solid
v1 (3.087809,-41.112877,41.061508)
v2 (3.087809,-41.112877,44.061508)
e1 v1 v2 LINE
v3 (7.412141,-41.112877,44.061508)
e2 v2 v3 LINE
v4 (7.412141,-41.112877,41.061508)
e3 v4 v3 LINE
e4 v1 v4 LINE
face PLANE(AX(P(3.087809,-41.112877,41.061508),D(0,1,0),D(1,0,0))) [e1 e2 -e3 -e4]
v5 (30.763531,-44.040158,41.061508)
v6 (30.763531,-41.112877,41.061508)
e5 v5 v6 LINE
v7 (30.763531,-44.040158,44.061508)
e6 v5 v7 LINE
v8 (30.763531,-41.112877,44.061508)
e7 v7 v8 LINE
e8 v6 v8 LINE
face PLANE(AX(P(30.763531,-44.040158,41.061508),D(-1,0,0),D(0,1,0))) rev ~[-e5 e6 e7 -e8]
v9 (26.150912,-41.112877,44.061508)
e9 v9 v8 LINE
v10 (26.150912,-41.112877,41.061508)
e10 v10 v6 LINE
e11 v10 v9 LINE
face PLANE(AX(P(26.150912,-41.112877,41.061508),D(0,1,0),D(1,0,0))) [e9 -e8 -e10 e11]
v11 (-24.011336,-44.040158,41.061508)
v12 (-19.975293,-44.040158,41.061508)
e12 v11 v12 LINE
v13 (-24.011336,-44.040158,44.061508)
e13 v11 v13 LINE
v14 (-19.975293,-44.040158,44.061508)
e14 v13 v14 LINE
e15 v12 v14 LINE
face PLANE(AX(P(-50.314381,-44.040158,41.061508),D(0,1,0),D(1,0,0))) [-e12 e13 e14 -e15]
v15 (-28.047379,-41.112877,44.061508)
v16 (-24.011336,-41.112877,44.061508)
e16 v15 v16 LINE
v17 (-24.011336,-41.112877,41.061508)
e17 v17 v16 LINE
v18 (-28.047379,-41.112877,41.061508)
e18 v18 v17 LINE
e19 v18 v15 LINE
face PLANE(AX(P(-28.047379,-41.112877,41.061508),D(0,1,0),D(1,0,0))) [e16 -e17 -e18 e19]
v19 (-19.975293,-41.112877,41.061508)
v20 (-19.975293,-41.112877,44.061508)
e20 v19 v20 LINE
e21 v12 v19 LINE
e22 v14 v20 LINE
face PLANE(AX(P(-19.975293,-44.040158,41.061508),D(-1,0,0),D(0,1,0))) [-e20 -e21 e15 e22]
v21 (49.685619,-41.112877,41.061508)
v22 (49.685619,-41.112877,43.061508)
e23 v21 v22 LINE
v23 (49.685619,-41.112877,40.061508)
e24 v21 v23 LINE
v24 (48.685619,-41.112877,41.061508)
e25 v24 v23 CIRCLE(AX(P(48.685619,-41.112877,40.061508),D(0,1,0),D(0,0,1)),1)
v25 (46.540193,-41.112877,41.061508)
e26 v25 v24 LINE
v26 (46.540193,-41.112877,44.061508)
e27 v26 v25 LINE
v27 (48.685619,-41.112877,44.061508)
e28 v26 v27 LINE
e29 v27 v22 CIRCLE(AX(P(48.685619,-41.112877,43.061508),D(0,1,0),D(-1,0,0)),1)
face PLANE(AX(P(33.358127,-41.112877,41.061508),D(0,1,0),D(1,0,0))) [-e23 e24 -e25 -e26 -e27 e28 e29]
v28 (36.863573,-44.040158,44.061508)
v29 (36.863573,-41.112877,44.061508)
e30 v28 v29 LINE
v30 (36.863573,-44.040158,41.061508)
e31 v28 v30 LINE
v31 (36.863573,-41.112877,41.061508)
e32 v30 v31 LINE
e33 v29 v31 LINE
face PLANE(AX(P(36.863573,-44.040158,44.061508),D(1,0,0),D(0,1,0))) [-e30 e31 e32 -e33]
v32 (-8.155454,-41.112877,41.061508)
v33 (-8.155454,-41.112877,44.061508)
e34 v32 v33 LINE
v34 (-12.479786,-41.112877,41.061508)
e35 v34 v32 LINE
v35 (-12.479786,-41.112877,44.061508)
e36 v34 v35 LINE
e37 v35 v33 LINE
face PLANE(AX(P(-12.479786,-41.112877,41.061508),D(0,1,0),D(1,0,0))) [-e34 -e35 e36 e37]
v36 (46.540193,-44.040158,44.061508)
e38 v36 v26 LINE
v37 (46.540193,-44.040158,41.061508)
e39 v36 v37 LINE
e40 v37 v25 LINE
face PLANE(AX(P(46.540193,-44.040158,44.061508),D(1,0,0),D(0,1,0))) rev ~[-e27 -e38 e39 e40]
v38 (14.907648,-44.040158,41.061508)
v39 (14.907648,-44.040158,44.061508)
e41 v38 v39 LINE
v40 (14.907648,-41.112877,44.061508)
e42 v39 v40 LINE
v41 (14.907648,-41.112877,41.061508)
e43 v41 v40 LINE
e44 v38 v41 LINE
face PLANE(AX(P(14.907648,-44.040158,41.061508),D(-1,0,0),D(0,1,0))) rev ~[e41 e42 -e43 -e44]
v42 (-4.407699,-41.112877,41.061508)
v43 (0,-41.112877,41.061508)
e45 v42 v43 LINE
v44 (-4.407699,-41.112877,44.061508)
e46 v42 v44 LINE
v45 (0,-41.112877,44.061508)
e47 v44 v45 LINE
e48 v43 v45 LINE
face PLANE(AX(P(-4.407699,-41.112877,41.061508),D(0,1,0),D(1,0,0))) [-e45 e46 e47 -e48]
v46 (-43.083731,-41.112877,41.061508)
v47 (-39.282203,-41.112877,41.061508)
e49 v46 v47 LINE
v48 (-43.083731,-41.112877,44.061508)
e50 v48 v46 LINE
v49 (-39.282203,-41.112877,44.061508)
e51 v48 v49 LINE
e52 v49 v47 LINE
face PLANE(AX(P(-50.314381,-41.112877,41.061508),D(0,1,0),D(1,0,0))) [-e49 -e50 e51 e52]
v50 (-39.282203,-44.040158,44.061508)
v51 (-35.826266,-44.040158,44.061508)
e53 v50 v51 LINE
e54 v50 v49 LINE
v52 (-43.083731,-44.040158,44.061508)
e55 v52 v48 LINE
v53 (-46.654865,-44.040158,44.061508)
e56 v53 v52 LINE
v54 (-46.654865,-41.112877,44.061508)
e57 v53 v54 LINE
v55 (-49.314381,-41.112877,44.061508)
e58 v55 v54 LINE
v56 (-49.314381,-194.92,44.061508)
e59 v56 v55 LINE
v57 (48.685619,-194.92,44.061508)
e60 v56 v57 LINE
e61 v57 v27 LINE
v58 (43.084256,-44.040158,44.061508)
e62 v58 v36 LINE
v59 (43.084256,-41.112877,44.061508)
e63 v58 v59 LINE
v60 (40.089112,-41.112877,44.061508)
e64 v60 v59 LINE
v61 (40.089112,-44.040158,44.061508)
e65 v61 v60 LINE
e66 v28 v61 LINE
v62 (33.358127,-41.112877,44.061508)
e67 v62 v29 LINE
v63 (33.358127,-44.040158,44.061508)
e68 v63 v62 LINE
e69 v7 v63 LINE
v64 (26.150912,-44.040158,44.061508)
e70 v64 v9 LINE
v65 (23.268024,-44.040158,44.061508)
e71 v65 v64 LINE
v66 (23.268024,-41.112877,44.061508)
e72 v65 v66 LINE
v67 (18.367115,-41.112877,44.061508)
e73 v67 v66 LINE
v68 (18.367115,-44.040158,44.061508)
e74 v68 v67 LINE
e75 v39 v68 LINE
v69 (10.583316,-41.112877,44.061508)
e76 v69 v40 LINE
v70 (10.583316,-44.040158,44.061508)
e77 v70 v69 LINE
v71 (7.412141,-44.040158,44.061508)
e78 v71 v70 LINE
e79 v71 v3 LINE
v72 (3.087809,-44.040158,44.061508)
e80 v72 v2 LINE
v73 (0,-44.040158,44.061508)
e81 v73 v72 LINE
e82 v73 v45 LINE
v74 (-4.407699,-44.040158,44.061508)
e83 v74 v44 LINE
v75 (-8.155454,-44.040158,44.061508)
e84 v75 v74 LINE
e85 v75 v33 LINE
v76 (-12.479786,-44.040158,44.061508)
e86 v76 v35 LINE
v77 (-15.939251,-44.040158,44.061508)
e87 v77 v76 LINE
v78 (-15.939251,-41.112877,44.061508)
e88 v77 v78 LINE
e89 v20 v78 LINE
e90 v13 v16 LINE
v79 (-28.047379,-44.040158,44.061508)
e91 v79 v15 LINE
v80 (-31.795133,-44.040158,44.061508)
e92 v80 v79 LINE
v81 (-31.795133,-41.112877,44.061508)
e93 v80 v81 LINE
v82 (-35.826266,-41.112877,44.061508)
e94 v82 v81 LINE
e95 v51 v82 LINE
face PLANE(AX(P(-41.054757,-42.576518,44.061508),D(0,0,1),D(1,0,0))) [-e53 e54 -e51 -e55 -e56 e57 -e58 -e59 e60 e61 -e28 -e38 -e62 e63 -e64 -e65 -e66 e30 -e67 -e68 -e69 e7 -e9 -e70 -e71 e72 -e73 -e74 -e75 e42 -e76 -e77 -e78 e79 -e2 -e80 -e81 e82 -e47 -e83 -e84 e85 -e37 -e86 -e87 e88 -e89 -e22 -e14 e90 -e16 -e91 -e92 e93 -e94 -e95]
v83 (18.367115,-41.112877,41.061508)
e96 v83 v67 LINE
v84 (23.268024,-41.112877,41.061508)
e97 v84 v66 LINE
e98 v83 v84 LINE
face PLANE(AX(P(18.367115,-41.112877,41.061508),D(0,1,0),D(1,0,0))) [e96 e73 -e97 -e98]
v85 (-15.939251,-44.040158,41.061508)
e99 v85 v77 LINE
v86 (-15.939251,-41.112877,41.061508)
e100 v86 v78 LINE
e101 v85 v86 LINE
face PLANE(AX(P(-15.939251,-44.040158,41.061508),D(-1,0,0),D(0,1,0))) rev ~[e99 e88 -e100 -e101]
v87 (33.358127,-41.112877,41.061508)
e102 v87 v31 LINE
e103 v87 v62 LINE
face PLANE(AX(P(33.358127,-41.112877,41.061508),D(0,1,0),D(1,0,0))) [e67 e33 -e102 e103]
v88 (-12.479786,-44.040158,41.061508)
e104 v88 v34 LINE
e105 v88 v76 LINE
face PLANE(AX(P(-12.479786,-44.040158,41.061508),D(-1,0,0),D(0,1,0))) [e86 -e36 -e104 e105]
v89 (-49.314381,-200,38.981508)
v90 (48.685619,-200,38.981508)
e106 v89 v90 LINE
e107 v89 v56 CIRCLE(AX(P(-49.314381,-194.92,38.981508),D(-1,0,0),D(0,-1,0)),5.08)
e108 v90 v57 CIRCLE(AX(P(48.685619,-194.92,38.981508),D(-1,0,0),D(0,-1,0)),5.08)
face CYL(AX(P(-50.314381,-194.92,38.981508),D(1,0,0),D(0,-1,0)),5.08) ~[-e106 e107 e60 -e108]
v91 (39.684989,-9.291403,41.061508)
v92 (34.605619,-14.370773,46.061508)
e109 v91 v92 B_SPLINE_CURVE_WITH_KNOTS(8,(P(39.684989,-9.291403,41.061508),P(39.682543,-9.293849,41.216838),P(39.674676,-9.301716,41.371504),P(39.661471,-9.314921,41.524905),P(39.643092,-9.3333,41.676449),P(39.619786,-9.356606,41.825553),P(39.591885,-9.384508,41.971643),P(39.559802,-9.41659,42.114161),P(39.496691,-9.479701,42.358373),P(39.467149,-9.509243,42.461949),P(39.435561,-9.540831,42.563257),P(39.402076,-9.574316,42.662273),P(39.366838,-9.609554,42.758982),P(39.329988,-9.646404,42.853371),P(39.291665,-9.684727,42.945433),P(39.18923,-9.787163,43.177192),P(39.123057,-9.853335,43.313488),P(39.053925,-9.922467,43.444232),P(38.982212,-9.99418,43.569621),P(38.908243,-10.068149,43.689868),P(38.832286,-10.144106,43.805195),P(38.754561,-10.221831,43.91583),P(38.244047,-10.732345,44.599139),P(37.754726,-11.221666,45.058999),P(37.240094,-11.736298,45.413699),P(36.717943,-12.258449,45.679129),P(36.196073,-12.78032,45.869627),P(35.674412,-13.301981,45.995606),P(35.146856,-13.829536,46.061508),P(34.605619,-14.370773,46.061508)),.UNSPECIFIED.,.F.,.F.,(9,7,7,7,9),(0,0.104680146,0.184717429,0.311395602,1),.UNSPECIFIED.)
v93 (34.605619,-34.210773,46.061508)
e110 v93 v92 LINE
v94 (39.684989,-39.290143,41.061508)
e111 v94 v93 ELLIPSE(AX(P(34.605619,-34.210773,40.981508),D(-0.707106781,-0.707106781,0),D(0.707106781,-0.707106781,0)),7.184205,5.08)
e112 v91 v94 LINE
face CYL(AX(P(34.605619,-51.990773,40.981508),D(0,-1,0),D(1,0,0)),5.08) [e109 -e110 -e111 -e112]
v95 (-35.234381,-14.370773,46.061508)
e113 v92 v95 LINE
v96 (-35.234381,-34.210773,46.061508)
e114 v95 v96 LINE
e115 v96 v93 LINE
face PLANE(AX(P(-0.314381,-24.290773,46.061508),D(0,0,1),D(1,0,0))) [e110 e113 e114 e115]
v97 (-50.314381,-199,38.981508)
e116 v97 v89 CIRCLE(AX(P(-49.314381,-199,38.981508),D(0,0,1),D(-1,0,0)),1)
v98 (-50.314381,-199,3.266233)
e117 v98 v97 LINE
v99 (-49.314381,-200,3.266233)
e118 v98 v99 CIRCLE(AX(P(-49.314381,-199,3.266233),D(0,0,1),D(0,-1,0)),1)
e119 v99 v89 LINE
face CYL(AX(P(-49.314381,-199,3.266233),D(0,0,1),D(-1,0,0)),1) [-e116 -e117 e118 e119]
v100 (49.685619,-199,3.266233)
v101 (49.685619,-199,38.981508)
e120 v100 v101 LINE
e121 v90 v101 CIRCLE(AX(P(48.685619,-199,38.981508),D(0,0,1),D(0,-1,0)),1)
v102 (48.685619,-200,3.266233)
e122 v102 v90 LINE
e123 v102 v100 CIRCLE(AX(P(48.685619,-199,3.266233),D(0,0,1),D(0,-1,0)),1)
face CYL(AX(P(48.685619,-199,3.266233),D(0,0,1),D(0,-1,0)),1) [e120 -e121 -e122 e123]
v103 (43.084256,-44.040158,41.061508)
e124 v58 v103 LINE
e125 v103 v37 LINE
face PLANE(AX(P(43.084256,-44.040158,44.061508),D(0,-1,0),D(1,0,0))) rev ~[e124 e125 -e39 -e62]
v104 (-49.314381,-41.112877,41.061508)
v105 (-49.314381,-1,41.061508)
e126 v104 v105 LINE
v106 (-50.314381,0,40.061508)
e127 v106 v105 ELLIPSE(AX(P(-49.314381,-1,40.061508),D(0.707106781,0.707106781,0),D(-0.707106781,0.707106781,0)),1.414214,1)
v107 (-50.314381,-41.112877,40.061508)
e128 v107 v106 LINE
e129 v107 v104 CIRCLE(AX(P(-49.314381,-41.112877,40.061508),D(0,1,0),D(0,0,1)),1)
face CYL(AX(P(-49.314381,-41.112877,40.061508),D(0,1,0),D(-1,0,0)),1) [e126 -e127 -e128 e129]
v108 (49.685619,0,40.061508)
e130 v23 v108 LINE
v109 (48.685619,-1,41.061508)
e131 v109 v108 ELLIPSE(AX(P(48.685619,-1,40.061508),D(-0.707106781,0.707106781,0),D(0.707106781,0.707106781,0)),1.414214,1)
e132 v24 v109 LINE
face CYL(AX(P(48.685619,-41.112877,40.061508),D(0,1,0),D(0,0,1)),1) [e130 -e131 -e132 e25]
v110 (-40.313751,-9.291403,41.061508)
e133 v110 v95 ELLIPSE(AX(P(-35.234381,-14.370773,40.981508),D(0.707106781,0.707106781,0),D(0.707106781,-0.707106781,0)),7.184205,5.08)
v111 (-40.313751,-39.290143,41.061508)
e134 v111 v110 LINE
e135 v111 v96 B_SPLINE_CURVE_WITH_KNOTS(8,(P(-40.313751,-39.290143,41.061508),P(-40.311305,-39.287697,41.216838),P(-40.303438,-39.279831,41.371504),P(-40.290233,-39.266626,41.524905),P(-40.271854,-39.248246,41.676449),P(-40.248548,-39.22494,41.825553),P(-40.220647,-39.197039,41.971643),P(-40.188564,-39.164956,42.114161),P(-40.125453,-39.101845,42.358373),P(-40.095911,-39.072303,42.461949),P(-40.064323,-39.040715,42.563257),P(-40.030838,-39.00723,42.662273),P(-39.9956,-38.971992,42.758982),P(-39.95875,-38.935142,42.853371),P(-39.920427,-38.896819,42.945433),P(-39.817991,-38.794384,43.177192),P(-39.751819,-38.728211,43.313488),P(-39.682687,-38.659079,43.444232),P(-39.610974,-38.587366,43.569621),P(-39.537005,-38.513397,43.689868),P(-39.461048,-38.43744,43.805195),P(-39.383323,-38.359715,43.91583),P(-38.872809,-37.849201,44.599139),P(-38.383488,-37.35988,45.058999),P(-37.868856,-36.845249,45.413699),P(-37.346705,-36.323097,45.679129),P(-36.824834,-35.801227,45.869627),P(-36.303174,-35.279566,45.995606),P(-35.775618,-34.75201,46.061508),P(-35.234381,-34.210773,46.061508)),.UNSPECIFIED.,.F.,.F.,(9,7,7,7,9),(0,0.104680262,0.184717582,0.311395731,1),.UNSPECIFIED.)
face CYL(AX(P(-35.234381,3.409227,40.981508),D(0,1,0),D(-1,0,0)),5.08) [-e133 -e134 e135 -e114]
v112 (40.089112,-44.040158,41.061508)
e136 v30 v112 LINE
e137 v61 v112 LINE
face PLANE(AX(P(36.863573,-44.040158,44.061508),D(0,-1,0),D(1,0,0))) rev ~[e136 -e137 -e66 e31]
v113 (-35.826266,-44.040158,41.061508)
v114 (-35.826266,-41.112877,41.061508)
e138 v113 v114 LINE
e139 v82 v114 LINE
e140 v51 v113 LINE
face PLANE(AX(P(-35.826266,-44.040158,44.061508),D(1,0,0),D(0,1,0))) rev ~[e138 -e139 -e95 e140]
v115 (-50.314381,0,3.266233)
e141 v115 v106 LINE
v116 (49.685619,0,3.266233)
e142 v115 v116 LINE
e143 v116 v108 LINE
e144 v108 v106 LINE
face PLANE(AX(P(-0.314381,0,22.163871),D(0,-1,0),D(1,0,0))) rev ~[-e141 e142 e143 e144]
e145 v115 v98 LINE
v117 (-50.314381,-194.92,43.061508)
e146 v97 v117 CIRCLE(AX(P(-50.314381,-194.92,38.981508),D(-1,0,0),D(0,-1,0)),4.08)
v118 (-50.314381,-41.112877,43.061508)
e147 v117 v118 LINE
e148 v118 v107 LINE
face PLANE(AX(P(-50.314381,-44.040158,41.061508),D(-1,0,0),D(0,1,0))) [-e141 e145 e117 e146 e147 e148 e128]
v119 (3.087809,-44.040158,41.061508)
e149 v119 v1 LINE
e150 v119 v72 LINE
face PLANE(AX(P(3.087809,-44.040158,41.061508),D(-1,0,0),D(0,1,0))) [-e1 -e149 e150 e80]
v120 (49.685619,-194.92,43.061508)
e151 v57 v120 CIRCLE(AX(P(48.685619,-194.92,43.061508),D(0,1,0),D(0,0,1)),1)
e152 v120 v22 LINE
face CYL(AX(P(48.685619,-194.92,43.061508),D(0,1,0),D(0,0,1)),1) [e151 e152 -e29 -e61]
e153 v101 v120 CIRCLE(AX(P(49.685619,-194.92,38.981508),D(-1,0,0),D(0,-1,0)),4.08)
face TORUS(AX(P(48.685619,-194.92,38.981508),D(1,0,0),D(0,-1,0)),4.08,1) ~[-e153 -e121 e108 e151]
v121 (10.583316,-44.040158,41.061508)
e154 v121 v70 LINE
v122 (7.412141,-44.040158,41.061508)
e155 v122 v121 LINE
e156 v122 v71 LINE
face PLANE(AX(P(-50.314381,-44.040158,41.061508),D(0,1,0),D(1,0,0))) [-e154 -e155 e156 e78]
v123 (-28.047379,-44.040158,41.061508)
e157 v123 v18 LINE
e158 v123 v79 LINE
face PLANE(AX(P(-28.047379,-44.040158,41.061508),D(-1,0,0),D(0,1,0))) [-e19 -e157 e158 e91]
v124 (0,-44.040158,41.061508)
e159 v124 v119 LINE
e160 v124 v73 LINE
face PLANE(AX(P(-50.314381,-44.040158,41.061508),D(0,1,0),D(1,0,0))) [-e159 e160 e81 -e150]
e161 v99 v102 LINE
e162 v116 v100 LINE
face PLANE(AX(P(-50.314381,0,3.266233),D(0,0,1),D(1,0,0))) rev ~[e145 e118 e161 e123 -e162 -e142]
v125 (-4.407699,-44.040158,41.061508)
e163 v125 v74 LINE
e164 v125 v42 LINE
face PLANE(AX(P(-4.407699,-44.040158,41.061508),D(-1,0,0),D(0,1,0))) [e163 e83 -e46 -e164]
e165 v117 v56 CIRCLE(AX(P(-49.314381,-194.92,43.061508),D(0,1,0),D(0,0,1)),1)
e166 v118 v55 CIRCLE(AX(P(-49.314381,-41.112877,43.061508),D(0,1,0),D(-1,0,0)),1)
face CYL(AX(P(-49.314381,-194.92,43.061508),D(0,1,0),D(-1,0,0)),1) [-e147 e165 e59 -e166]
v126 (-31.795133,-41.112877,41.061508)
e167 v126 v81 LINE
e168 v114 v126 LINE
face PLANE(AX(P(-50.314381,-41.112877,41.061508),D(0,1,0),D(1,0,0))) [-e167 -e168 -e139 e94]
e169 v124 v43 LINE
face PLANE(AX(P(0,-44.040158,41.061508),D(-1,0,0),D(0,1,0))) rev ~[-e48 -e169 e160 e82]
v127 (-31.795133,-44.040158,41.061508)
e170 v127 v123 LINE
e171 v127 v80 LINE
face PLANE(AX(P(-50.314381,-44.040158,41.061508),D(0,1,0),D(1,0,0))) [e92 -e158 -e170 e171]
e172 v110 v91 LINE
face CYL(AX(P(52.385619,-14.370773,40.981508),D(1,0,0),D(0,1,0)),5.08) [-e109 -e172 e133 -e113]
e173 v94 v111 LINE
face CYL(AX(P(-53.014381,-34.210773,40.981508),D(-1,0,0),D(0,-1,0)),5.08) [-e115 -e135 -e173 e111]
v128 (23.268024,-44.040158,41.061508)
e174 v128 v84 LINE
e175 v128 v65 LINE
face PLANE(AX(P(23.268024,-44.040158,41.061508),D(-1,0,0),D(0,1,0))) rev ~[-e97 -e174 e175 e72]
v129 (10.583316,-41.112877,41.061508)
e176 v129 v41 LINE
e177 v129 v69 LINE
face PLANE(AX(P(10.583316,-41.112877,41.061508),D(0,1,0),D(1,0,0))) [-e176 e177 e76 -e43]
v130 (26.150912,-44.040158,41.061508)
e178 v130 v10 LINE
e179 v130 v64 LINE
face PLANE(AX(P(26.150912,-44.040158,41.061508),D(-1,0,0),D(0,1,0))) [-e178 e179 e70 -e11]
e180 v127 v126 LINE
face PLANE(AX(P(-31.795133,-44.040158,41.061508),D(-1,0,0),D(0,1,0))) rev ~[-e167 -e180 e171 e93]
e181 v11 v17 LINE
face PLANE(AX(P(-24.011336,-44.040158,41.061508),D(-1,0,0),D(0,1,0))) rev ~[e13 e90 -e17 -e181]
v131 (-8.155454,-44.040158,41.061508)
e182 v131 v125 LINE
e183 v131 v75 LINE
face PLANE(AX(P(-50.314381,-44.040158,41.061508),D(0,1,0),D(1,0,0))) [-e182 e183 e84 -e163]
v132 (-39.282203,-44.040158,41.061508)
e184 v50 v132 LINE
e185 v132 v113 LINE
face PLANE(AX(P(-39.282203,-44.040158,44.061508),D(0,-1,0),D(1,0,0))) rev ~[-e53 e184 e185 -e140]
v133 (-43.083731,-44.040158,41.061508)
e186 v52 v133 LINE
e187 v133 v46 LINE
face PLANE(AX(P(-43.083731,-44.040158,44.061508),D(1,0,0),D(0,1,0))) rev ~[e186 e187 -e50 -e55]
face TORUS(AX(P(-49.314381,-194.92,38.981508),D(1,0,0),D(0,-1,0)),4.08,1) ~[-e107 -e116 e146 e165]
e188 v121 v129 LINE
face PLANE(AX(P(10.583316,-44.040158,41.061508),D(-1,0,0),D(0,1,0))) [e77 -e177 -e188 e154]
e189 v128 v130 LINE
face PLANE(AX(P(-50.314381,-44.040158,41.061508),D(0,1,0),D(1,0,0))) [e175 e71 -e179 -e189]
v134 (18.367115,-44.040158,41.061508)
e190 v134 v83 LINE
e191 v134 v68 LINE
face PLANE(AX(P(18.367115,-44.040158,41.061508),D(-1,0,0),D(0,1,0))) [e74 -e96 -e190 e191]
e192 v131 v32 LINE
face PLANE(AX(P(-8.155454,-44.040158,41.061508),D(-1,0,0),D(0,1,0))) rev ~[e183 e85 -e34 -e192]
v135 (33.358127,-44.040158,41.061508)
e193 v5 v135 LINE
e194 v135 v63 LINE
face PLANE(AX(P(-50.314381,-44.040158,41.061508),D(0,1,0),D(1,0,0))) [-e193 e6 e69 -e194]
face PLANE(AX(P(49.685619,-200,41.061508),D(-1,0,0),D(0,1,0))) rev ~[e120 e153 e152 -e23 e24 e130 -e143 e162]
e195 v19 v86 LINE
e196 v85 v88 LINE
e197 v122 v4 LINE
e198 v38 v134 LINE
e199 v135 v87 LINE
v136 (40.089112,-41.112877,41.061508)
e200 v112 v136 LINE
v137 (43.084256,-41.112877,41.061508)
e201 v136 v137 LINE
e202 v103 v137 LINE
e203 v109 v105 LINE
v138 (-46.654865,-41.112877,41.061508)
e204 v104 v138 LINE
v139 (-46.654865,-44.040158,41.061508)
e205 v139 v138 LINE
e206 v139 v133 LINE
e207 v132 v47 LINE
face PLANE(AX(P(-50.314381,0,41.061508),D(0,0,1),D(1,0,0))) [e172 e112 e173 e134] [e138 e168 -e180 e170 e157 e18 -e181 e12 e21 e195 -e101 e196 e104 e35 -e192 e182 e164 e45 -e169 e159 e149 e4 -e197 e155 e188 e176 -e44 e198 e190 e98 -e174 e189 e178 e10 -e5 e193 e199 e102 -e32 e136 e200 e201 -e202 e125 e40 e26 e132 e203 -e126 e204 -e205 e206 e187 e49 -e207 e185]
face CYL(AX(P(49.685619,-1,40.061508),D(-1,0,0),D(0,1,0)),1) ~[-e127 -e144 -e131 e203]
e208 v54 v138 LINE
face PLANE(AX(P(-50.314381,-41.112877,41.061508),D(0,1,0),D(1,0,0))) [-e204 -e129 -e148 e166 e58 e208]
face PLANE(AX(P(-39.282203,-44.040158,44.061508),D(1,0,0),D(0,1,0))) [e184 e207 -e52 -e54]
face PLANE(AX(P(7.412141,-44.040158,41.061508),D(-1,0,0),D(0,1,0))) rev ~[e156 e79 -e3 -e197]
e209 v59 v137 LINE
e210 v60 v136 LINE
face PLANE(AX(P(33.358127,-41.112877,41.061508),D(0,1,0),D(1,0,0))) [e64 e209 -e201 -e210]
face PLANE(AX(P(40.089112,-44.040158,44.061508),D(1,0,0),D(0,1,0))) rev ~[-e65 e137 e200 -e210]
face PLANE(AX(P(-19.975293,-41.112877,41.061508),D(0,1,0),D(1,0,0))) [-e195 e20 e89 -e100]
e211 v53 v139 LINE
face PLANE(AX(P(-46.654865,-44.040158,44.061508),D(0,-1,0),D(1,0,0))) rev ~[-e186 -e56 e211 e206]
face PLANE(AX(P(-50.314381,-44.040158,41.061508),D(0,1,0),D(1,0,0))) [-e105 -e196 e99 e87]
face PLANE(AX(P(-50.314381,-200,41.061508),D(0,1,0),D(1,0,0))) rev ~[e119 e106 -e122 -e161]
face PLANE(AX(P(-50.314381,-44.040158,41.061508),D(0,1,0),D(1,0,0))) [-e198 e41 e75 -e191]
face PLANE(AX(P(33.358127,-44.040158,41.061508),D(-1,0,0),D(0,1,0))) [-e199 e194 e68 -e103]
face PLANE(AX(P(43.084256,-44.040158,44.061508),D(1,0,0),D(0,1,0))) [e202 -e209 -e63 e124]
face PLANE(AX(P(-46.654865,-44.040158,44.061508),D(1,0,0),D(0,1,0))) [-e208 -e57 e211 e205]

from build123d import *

# Parameters (mm, degrees)
F0_W         = 100
F0_H         = 37.7952754252
F1_DEPTH     = 200
F2_W         = 80
F2_H         = 30
F3_DEPTH     = 5
F4_T4_DEPTH  = 55.4
F4_T9_DEPTH  = 105.4
F4_T14_DEPTH = 55.4
F4_T19_DEPTH = 105.4
F5_W         = 100
F5_H         = 155.959841609
F6_DEPTH     = 3
F7_W         = 18.5192480683
F7_H         = 2.9272809625
F7_W_2       = 4.0360428393
F7_W_3       = 4.3243318796
F7_W_4       = 4.4076992199
F7_W_5       = 4.324331414
F7_W_6       = 4.9009080976
F7_W_7       = 4.6126190573
F7_W_8       = 16.3274921477
F8_DEPTH     = 3
F9_W         = 3.4559369087
F9_H         = 2.9272809625
F9_W_2       = 3.5711340606
F9_W_3       = 3.2255388796
F10_DEPTH    = 3
F11_R        = 5.08
F12_R        = 1


# Not quite as in the source:
# - a fillet or chamfer that OpenCascade refuses, or shapes differently, is made with other operations: its cross-section is extruded or revolved along the edge and cut away or added


with BuildPart() as f1:
    # F0 (on Front) → F1 (new body)
    with BuildSketch(Plane.XZ):
        with Locations((-0.3143809736, 22.1638707444)):
            Rectangle(F0_W, F0_H)
    extrude(amount=F1_DEPTH)

    # F2 (on face) → F3 (join)
    with BuildSketch(Plane.XY.offset(41.061508457)):
        with Locations((-0.3143809736, -24.2907730862)):
            Rectangle(F2_W, F2_H)
    extrude(amount=F3_DEPTH)

    # F4: fillet of radius 5.08 on 4 edges, made by hand


with BuildPart() as f4_tool2:
    # F4_s3 → F4_t4 (new body)
    with BuildSketch(Plane.XZ.offset(51.9907730862)):
        with BuildLine():
            ThreePointArc((39.6856190264, 40.981508457), (38.1977214749, 44.5736109055), (34.6056190264, 46.061508457))
            Line((34.6056190264, 46.061508457), (39.6856190264, 46.061508457))
            Line((39.6856190264, 46.061508457), (39.6856190264, 40.981508457))
        make_face()
    extrude(amount=-F4_T4_DEPTH)

    split(bisect_by=Plane.XY.offset(41.061508457), keep=Keep.TOP)


with BuildPart() as f1_1:
    add(f1.part)

    # F4_t1: cut F4_tool2
    add(f4_tool2.part, mode=Mode.SUBTRACT)


with BuildPart() as f4_tool7:
    # F4_s8 → F4_t9 (new body)
    with BuildSketch(Plane.YZ.offset(52.3856190264)):
        with BuildLine():
            ThreePointArc((-9.2907730862, 40.981508457), (-10.7786706378, 44.5736109055), (-14.3707730862, 46.061508457))
            Line((-14.3707730862, 46.061508457), (-9.2907730862, 46.061508457))
            Line((-9.2907730862, 46.061508457), (-9.2907730862, 40.981508457))
        make_face()
    extrude(amount=-F4_T9_DEPTH)

    split(bisect_by=Plane.XY.offset(41.061508457), keep=Keep.TOP)


with BuildPart() as f1_2:
    add(f1_1.part)

    # F4_t6: cut F4_tool7
    add(f4_tool7.part, mode=Mode.SUBTRACT)


with BuildPart() as f4_tool12:
    # F4_s13 → F4_t14 (new body)
    with BuildSketch(Plane.XZ.offset(-3.4092269138)):
        with BuildLine():
            ThreePointArc((-40.3143809736, 40.981508457), (-38.826483422, 44.5736109055), (-35.2343809736, 46.061508457))
            Line((-35.2343809736, 46.061508457), (-40.3143809736, 46.061508457))
            Line((-40.3143809736, 46.061508457), (-40.3143809736, 40.981508457))
        make_face()
    extrude(amount=F4_T14_DEPTH)

    split(bisect_by=Plane.XY.offset(41.061508457), keep=Keep.TOP)


with BuildPart() as f1_3:
    add(f1_2.part)

    # F4_t11: cut F4_tool12
    add(f4_tool12.part, mode=Mode.SUBTRACT)


with BuildPart() as f4_tool17:
    # F4_s18 → F4_t19 (new body)
    with BuildSketch(Plane.YZ.offset(-53.0143809736)):
        with BuildLine():
            ThreePointArc((-39.2907730862, 40.981508457), (-37.8028755347, 44.5736109055), (-34.2107730862, 46.061508457))
            Line((-34.2107730862, 46.061508457), (-39.2907730862, 46.061508457))
            Line((-39.2907730862, 46.061508457), (-39.2907730862, 40.981508457))
        make_face()
    extrude(amount=F4_T19_DEPTH)

    split(bisect_by=Plane.XY.offset(41.061508457), keep=Keep.TOP)


with BuildPart() as f1_4:
    add(f1_3.part)

    # F4_t16: cut F4_tool17
    add(f4_tool17.part, mode=Mode.SUBTRACT)

    # F5 (on face) → F6 (join)
    with BuildSketch(Plane.XY.offset(41.061508457)):
        with Locations((-0.3143809736, -122.0200791955)):
            Rectangle(F5_W, F5_H)
    extrude(amount=F6_DEPTH)

    # F7 (on face) → F8 (join)
    with BuildSketch(Plane.XY.offset(41.061508457)):
        with Locations((-41.0547569394, -42.5765179098)):
            Rectangle(F7_W, F7_H)
        with Locations((-26.0293576866, -42.5765179098)):
            Rectangle(F7_W_2, F7_H)
        with Locations((-17.9572720081, -42.5765179098)):
            Rectangle(F7_W_2, F7_H)
        with Locations((-10.31761989, -42.5765179098)):
            Rectangle(F7_W_3, F7_H)
        with Locations((-2.2038496099, -42.5765179098)):
            Rectangle(F7_W_4, F7_H)
        with Locations((5.2499750163, -42.5765179098)):
            Rectangle(F7_W_5, F7_H)
        with Locations((12.7454819158, -42.5765179098)):
            Rectangle(F7_W_3, F7_H)
        with Locations((20.817569457, -42.5765179098)):
            Rectangle(F7_W_6, F7_H)
        with Locations((28.4572215751, -42.5765179098)):
            Rectangle(F7_W_7, F7_H)
        with Locations((41.5218729526, -42.5765179098)):
            Rectangle(F7_W_8, F7_H)
    extrude(amount=F8_DEPTH)

    # F9 (on face) → F10 (cut)
    with BuildSketch(Plane.XY.offset(44.061508457)):
        with Locations((-37.5542342663, -42.5765179098)):
            Rectangle(F9_W, F9_H)
        with Locations((-44.8692981154, -42.5765179098)):
            Rectangle(F9_W_2, F9_H)
        with Locations((38.4763423353, -42.5765179098)):
            Rectangle(F9_W_3, F9_H)
        with Locations((44.8122248054, -42.5765179098)):
            Rectangle(F9_W, F9_H)
    extrude(amount=-F10_DEPTH, mode=Mode.SUBTRACT)

    # F11
    f11_edges = [f1_4.edges().sort_by_distance(p)[0] for p in [
        (-0.314381, -200, 44.061508),
    ]]
    fillet(f11_edges, radius=F11_R)

    # F12
    f12_edges = [f1_4.edges().sort_by_distance(p)[0] for p in [
        (49.685619, -20.556439, 41.061508),
        (-0.314381, 0, 41.061508),
        (-50.314381, -20.556439, 41.061508),
        (-50.314381, -118.016439, 44.061508),
        (49.685619, -118.016439, 44.061508),
    ]]
    fillet(f12_edges, radius=F12_R)


solid = f1_4.part
